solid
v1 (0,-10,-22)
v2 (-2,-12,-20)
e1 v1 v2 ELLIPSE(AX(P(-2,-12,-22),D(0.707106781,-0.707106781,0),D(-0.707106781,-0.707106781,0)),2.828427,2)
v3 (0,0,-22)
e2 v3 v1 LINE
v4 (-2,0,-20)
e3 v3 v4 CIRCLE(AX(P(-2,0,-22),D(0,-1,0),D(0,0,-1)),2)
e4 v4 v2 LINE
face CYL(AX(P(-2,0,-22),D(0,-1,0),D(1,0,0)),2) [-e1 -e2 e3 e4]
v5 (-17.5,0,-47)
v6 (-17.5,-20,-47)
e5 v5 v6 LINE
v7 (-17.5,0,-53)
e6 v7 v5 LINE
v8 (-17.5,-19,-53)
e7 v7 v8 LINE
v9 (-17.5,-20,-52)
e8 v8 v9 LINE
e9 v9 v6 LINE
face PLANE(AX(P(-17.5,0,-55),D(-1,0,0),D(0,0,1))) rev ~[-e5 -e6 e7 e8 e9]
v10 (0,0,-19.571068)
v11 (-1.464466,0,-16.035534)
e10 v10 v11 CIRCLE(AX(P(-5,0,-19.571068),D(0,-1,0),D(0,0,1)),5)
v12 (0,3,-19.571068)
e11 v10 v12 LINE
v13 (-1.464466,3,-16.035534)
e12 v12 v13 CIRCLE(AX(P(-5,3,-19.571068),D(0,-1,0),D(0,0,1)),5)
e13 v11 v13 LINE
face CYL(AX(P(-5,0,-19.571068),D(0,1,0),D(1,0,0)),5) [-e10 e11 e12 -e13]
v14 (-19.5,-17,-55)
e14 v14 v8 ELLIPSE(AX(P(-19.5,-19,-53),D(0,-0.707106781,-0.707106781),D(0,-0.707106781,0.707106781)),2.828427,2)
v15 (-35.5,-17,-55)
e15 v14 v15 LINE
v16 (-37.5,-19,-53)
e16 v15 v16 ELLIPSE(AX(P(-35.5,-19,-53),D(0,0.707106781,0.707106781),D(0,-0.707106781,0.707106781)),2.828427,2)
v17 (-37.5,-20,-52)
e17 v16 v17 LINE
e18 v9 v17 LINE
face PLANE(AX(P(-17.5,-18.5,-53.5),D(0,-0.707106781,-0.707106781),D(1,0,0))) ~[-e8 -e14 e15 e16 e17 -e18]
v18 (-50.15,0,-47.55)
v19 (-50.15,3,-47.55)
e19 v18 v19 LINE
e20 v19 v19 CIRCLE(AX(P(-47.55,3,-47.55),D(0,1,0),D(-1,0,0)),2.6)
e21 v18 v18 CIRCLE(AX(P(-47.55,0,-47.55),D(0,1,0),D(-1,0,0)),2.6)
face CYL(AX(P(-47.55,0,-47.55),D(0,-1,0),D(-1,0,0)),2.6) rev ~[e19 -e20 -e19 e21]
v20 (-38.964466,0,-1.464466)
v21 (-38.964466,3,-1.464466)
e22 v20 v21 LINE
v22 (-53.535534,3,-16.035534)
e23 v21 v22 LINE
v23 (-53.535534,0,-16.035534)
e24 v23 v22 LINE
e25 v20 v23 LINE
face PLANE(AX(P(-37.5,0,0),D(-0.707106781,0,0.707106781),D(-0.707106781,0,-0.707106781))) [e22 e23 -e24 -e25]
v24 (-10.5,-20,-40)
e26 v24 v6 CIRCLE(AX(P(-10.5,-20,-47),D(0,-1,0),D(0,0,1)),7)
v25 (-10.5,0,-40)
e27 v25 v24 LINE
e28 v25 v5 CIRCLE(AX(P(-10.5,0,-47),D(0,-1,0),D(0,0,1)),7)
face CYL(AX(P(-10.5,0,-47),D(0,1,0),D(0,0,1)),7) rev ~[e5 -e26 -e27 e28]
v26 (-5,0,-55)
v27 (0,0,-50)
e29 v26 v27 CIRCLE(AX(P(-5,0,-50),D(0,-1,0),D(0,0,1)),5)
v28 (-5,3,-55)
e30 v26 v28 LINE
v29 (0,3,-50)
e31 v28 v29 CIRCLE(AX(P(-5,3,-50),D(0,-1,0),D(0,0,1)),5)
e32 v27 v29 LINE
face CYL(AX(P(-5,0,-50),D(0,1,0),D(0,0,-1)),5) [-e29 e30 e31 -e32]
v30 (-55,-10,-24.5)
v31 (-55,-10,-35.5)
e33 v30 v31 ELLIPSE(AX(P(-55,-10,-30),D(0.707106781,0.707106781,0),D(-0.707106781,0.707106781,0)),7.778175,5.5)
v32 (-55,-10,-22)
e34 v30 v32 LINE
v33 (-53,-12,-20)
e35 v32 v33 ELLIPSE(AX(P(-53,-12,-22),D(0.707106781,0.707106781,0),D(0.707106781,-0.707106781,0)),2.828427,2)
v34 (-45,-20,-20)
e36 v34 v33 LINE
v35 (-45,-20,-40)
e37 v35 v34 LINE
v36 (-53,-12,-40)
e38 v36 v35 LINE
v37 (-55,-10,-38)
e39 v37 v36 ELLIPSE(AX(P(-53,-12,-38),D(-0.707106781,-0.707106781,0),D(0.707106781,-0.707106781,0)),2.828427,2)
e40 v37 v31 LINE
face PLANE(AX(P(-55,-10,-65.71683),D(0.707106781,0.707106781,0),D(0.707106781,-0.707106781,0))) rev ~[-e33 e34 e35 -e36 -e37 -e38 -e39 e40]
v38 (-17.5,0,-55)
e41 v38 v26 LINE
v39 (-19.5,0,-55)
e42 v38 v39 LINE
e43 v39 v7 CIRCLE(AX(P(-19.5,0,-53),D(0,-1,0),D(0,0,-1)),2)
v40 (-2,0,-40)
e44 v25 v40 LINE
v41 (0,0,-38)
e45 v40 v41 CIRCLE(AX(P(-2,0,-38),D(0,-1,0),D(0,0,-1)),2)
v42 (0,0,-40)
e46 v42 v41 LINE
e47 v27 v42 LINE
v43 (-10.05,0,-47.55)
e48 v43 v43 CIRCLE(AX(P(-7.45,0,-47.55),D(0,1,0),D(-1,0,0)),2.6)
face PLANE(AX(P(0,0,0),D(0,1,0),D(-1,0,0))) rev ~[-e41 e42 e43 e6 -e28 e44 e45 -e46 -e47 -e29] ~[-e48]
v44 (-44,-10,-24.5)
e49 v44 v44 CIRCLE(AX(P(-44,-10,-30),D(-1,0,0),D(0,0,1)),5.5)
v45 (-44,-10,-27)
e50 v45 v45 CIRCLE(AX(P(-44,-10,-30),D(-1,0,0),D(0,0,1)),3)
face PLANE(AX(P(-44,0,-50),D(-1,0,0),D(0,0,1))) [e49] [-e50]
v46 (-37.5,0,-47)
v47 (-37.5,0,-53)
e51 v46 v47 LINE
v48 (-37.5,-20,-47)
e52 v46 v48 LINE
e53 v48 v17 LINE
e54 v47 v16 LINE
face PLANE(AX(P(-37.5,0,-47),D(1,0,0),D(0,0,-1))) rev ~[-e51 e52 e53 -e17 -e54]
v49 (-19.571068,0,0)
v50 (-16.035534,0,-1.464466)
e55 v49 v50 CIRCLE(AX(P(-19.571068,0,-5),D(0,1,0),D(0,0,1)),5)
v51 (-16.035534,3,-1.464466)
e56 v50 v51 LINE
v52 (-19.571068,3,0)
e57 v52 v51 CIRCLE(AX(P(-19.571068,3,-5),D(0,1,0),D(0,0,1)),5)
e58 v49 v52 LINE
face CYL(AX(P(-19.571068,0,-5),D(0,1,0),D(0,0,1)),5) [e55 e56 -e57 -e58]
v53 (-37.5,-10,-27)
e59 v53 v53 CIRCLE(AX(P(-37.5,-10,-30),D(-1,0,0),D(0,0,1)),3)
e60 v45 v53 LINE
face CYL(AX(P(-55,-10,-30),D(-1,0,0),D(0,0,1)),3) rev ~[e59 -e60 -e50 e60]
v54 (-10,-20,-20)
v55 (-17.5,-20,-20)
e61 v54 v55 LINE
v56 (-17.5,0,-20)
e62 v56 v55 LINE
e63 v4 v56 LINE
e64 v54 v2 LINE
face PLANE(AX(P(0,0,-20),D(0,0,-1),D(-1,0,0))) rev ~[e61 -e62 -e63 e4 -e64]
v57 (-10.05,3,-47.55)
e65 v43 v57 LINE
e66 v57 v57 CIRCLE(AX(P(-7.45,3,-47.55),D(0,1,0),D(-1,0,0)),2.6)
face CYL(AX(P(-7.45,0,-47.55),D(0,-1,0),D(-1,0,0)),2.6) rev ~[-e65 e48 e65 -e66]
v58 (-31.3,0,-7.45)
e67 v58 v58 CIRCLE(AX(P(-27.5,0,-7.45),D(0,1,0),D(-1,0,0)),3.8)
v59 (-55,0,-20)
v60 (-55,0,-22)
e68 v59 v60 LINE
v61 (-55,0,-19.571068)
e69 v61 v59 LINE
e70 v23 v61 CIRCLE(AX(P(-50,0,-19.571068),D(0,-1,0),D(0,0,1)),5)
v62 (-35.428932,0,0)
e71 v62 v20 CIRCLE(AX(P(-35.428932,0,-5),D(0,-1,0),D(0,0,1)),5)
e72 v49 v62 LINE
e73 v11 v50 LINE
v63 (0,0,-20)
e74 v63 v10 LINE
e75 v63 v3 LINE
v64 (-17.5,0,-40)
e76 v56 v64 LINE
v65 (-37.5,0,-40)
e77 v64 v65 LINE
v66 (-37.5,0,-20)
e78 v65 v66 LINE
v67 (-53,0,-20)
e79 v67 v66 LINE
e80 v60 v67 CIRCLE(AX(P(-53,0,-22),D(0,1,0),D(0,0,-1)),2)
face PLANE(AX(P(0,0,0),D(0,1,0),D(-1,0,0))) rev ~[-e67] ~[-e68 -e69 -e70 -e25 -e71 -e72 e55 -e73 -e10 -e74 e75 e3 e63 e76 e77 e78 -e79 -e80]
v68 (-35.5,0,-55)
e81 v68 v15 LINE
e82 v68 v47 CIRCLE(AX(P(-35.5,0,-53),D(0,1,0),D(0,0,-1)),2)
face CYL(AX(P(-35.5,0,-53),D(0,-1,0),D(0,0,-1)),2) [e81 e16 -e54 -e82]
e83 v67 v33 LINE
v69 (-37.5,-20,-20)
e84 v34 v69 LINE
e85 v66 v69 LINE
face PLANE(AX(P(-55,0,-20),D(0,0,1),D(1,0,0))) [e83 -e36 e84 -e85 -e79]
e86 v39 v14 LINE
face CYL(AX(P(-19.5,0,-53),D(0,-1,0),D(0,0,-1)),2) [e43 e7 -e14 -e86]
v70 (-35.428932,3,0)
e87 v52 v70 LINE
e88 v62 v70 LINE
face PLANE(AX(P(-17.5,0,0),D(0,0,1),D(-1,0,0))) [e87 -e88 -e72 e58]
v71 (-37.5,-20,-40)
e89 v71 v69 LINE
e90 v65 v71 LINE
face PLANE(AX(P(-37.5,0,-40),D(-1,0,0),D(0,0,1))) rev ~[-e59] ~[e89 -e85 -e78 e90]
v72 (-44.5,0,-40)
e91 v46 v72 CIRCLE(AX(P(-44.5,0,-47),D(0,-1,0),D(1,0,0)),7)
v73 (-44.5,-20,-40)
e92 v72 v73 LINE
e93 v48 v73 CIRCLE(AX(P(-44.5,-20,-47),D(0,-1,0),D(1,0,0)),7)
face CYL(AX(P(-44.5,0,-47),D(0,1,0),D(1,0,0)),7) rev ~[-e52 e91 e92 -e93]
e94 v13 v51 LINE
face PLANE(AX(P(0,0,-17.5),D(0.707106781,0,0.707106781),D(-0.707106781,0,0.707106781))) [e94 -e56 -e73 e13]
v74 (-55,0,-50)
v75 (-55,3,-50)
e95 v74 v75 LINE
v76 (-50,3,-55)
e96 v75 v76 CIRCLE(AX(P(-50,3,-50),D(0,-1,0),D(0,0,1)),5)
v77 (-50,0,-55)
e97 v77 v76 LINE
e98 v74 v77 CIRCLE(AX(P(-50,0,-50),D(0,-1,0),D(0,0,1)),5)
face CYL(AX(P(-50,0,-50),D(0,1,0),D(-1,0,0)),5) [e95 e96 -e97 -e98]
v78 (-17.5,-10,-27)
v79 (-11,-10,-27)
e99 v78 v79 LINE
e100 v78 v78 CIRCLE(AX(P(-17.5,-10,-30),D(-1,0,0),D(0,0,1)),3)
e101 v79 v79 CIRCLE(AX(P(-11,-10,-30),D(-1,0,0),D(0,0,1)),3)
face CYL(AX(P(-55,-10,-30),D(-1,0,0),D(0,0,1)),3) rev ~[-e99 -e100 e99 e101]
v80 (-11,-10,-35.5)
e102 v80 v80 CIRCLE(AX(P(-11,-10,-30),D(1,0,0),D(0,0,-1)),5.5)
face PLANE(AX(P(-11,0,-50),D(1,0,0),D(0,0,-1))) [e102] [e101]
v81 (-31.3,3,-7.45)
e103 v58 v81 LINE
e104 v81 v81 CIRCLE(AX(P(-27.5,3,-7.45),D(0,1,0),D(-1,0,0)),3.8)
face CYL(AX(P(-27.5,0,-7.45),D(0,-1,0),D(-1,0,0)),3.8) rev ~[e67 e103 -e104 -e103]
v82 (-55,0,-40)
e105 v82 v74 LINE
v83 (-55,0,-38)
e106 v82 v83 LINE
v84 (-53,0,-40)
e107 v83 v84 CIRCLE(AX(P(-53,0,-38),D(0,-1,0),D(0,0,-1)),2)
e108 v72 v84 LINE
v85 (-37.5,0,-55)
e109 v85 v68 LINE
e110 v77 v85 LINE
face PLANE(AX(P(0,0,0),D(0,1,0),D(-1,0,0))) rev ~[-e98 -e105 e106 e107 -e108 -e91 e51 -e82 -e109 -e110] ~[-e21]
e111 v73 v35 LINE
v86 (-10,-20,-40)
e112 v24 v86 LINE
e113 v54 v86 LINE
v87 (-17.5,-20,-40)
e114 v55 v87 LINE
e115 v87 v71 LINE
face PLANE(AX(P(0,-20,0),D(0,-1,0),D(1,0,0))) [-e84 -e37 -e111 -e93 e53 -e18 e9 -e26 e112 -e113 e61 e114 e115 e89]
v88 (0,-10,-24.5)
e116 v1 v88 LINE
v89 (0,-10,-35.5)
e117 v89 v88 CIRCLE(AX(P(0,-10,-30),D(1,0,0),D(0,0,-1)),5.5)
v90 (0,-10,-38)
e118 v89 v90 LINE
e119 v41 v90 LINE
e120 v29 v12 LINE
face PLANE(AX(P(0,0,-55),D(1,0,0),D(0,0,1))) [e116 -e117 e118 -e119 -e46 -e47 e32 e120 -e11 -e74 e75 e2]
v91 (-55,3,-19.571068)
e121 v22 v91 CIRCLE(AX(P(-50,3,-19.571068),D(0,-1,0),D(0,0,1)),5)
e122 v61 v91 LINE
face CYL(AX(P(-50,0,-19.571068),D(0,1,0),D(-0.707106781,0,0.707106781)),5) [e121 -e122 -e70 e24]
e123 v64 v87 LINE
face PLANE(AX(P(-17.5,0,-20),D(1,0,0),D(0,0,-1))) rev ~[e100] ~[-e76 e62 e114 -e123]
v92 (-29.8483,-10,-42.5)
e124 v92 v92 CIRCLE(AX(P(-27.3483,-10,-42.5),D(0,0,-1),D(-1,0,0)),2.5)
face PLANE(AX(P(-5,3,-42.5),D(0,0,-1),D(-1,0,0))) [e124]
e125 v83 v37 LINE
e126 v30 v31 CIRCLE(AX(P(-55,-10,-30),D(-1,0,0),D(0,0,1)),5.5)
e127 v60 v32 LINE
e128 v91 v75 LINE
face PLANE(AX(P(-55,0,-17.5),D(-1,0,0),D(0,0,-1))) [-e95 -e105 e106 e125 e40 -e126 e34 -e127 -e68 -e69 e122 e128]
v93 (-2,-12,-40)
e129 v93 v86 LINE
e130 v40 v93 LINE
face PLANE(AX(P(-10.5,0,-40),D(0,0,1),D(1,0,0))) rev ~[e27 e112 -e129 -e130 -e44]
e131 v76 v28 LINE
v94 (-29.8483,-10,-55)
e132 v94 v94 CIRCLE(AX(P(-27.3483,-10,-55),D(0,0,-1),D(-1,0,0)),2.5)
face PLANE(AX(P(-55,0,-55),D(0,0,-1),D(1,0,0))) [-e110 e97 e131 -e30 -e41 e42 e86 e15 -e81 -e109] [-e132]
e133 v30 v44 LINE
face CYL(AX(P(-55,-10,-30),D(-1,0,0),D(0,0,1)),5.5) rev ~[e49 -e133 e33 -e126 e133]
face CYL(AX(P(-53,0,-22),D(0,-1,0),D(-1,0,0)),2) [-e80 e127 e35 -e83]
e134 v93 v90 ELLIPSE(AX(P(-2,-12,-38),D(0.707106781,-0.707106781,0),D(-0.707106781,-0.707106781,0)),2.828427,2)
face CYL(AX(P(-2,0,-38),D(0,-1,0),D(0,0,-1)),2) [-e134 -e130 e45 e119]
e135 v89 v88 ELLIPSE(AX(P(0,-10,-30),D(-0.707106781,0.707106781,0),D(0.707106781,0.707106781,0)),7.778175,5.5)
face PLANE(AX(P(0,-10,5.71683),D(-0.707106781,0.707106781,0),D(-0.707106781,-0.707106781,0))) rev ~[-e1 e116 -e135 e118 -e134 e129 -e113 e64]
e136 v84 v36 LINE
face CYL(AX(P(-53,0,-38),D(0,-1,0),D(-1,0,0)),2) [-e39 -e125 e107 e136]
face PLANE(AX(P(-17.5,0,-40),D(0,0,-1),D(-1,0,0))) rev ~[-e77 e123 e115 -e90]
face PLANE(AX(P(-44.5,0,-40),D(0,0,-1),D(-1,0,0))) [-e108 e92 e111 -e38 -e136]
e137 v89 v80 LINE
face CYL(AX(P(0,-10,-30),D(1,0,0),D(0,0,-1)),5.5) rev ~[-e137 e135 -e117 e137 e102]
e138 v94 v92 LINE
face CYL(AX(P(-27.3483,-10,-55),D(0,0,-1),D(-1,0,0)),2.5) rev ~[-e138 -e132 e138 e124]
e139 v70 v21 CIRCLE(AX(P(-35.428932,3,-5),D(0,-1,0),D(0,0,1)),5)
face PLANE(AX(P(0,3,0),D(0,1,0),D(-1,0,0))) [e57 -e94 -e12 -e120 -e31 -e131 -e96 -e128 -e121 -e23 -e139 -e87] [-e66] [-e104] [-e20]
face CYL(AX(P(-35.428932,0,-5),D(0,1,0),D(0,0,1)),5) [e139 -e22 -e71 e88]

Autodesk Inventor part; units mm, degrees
ref_plane "YZ Plane" through (0, 0, 0) normal (1, 0, 0) x (0, 1, 0)
ref_plane "XZ Plane" through (0, 0, 0) normal (0, 1, 0) x (-1, 0, 0)
ref_plane "XY Plane" through (0, 0, 0) normal (0, 0, 1) x (1, 0, 0)
sketch "Sketch1" plane through (0, 0, 0) normal (0, 1, 0) x (-1, 0, 0)
  line L0 (0, 0) -> (55, 0)
  line L1 (55, 0) -> (55, -55)
  line L2 (55, -55) -> (0, -55)
  line L3 (0, -55) -> (0, 0)
  line L4 (47.55, -7.45) -> (7.45, -7.45) construction
  line L5 (7.45, -7.45) -> (7.45, -47.55) construction
  line L6 (7.45, -47.55) -> (47.55, -47.55) construction
  line L7 (47.55, -47.55) -> (47.55, -7.45) construction
  circle A0 centre (47.55, -47.55) radius 2.6
  circle A1 centre (7.45, -47.55) radius 2.6
  circle A2 centre (27.5, -7.45) radius 3.8
  line L8 (0, -17.5) -> (17.5, 0)
  line L9 (37.5, 0) -> (55, -17.5)
  dimension "d0" = 55
  dimension "d1" = 55
  dimension "d2" = 40.1
  dimension "d3" = 40.1
  dimension "d6" = 5.2
  dimension "d7" = 5.2
  dimension "d8" = 7.45
  dimension "d9" = 7.45
  dimension "d14" = 7.6
  dimension "d55" = 20
  dimension "d56" = 10
extrude "Extrusion1" add sketch "Sketch1" along normal blind 3 contours L0 L9 L1 L2 L3 L8
fillet "Fillet1" radius 5 6 edges at (-55, 1.5, -55) (0, 1.5, -55) (-55, 1.5, -17.5) (-37.5, 1.5, 0) (-17.5, 1.5, 0) (0, 1.5, -17.5)
sketch "Sketch2" plane through (0, 0, 0) normal (0, -1, 0) x (1, 0, 0)
  line L0 (-17.5, -40) -> (-37.5, -40)
  line L1 (-37.5, -40) -> (-37.5, -20)
  line L2 (-37.5, -20) -> (-17.5, -20)
  line L3 (-17.5, -20) -> (-17.5, -40)
  line L4 (-5, -55) -> (-50, -55) projected
  line L5 (-17.5, -40) -> (-37.5, -40)
  line L6 (-37.5, -47) -> (-37.5, -55)
  line L7 (-37.5, -55) -> (-17.5, -55)
  line L8 (-17.5, -55) -> (-17.5, -47)
  line L9 (0, -19.5711) -> (0, -50) projected
  line L10 (-55, -50) -> (-55, -19.5711) projected
  line L11 (-10.5, -40) -> (0, -40)
  line L12 (0, -40) -> (0, -20)
  line L13 (0, -20) -> (-17.5, -20)
  line L14 (-17.5, -20) -> (-17.5, -40)
  line L15 (-44.5, -40) -> (-55, -40)
  line L16 (-55, -40) -> (-55, -20)
  line L17 (-55, -20) -> (-37.5, -20)
  line L18 (-37.5, -20) -> (-37.5, -40)
  arc A0 (-10.5, -40) -> (-17.5, -47) centre (-10.5, -47) ccw
  arc A1 (-37.5, -47) -> (-44.5, -40) centre (-44.5, -47) ccw
  point P0 (0, -40)
  point P1 (-17.5, -55)
  dimension "d68" = 20
  dimension "d69" = 20
  dimension "d70" = 55
  dimension "d71" = 17.5
  dimension "d72" = 15
  dimension "d73" = 7
extrude "Extrusion8" add sketch "Sketch2" along normal blind 20 contours L3 L13 L9 L11 A0 L8 L4 L6 A1 L15 L10 L17 L1 L0
sketch "Sketch6" plane through (-55, 0, -50) normal (-1, 0, 0) x (0, 0, 1)
  line L0 (10, -20) -> (30, -20) construction
  line L1 (10, 0) -> (30, 0) construction
  line L2 (10, -20) -> (30, 0) construction
  circle A0 centre (20, -10) radius 3
  point P0 (50, 0)
  dimension "d44" = 6
extrude "Extrusion9" cut sketch "Sketch6" against normal through all
sketch "Sketch7" plane through (-55, 0, -50) normal (-1, 0, 0) x (0, 0, 1)
  circle A0 centre (20, -10) radius 3 projected
  circle A1 centre (20, -10) radius 5.5
  point P0 (50, 0)
  dimension "d47" = 11
extrude "Extrusion10" cut sketch "Sketch7" against normal blind 11 contours A0 | A1
sketch "Sketch8" plane through (0, 0, -50) normal (1, 0, 0) x (0, 0, -1)
  line L0 (-30, 0) -> (-30, -20) construction
  line L1 (-10, 0) -> (-30, 0) construction
  line L2 (-30, -20) -> (-10, 0) construction
  circle A0 centre (-20, -10) radius 5.5 projected
  circle A1 centre (-20, -10) radius 5.5 construction
  point P0 (-50, 0)
extrude "Extrusion11" cut sketch "Sketch8" against normal blind 11
chamfer "Chamfer3" distance 10 angle 45 2 edges at (-55, -20, -30) (0, -20, -30)
sketch "Sketch11" plane through (-5, 3, -55) normal (0, 0, -1) x (-1, 0, 0)
  line L0 (32.5, -23) -> (12.5, -23) construction
  line L1 (12.5, -23) -> (32.1967, -3) construction
  line L2 (33.9645, -3) -> (30.4289, -3) construction
  circle A0 centre (22.3483, -13) radius 2.5
  point P0 (-5, -3)
  dimension "d74" = 5
extrude "Extrusion14" cut sketch "Sketch11" against normal blind 12.5
chamfer "Chamfer4" distance 3 angle 45 1 edges at (-27.5, -20, -55)
fillet "Fillet2" radius 2 6 edges at (-55, -5, -40) (-55, -5, -20) (0, -5, -20) (0, -5, -40) (-37.5, -8.5, -55) (-17.5, -8.5, -55)
equation "\"d1\" = d0"
equation "\"d3\" = d2"
equation "\"d8\" = -0.5 * d2 + 0.5 * d0"
equation "\"d9\" = -0.5 * d3 + 0.5 * d1"
equation "\"d71\" = -0.5 * d68 + 0.5 * d70"
properties part number "Gantry Plate" material "PC/ABS Plastic"
